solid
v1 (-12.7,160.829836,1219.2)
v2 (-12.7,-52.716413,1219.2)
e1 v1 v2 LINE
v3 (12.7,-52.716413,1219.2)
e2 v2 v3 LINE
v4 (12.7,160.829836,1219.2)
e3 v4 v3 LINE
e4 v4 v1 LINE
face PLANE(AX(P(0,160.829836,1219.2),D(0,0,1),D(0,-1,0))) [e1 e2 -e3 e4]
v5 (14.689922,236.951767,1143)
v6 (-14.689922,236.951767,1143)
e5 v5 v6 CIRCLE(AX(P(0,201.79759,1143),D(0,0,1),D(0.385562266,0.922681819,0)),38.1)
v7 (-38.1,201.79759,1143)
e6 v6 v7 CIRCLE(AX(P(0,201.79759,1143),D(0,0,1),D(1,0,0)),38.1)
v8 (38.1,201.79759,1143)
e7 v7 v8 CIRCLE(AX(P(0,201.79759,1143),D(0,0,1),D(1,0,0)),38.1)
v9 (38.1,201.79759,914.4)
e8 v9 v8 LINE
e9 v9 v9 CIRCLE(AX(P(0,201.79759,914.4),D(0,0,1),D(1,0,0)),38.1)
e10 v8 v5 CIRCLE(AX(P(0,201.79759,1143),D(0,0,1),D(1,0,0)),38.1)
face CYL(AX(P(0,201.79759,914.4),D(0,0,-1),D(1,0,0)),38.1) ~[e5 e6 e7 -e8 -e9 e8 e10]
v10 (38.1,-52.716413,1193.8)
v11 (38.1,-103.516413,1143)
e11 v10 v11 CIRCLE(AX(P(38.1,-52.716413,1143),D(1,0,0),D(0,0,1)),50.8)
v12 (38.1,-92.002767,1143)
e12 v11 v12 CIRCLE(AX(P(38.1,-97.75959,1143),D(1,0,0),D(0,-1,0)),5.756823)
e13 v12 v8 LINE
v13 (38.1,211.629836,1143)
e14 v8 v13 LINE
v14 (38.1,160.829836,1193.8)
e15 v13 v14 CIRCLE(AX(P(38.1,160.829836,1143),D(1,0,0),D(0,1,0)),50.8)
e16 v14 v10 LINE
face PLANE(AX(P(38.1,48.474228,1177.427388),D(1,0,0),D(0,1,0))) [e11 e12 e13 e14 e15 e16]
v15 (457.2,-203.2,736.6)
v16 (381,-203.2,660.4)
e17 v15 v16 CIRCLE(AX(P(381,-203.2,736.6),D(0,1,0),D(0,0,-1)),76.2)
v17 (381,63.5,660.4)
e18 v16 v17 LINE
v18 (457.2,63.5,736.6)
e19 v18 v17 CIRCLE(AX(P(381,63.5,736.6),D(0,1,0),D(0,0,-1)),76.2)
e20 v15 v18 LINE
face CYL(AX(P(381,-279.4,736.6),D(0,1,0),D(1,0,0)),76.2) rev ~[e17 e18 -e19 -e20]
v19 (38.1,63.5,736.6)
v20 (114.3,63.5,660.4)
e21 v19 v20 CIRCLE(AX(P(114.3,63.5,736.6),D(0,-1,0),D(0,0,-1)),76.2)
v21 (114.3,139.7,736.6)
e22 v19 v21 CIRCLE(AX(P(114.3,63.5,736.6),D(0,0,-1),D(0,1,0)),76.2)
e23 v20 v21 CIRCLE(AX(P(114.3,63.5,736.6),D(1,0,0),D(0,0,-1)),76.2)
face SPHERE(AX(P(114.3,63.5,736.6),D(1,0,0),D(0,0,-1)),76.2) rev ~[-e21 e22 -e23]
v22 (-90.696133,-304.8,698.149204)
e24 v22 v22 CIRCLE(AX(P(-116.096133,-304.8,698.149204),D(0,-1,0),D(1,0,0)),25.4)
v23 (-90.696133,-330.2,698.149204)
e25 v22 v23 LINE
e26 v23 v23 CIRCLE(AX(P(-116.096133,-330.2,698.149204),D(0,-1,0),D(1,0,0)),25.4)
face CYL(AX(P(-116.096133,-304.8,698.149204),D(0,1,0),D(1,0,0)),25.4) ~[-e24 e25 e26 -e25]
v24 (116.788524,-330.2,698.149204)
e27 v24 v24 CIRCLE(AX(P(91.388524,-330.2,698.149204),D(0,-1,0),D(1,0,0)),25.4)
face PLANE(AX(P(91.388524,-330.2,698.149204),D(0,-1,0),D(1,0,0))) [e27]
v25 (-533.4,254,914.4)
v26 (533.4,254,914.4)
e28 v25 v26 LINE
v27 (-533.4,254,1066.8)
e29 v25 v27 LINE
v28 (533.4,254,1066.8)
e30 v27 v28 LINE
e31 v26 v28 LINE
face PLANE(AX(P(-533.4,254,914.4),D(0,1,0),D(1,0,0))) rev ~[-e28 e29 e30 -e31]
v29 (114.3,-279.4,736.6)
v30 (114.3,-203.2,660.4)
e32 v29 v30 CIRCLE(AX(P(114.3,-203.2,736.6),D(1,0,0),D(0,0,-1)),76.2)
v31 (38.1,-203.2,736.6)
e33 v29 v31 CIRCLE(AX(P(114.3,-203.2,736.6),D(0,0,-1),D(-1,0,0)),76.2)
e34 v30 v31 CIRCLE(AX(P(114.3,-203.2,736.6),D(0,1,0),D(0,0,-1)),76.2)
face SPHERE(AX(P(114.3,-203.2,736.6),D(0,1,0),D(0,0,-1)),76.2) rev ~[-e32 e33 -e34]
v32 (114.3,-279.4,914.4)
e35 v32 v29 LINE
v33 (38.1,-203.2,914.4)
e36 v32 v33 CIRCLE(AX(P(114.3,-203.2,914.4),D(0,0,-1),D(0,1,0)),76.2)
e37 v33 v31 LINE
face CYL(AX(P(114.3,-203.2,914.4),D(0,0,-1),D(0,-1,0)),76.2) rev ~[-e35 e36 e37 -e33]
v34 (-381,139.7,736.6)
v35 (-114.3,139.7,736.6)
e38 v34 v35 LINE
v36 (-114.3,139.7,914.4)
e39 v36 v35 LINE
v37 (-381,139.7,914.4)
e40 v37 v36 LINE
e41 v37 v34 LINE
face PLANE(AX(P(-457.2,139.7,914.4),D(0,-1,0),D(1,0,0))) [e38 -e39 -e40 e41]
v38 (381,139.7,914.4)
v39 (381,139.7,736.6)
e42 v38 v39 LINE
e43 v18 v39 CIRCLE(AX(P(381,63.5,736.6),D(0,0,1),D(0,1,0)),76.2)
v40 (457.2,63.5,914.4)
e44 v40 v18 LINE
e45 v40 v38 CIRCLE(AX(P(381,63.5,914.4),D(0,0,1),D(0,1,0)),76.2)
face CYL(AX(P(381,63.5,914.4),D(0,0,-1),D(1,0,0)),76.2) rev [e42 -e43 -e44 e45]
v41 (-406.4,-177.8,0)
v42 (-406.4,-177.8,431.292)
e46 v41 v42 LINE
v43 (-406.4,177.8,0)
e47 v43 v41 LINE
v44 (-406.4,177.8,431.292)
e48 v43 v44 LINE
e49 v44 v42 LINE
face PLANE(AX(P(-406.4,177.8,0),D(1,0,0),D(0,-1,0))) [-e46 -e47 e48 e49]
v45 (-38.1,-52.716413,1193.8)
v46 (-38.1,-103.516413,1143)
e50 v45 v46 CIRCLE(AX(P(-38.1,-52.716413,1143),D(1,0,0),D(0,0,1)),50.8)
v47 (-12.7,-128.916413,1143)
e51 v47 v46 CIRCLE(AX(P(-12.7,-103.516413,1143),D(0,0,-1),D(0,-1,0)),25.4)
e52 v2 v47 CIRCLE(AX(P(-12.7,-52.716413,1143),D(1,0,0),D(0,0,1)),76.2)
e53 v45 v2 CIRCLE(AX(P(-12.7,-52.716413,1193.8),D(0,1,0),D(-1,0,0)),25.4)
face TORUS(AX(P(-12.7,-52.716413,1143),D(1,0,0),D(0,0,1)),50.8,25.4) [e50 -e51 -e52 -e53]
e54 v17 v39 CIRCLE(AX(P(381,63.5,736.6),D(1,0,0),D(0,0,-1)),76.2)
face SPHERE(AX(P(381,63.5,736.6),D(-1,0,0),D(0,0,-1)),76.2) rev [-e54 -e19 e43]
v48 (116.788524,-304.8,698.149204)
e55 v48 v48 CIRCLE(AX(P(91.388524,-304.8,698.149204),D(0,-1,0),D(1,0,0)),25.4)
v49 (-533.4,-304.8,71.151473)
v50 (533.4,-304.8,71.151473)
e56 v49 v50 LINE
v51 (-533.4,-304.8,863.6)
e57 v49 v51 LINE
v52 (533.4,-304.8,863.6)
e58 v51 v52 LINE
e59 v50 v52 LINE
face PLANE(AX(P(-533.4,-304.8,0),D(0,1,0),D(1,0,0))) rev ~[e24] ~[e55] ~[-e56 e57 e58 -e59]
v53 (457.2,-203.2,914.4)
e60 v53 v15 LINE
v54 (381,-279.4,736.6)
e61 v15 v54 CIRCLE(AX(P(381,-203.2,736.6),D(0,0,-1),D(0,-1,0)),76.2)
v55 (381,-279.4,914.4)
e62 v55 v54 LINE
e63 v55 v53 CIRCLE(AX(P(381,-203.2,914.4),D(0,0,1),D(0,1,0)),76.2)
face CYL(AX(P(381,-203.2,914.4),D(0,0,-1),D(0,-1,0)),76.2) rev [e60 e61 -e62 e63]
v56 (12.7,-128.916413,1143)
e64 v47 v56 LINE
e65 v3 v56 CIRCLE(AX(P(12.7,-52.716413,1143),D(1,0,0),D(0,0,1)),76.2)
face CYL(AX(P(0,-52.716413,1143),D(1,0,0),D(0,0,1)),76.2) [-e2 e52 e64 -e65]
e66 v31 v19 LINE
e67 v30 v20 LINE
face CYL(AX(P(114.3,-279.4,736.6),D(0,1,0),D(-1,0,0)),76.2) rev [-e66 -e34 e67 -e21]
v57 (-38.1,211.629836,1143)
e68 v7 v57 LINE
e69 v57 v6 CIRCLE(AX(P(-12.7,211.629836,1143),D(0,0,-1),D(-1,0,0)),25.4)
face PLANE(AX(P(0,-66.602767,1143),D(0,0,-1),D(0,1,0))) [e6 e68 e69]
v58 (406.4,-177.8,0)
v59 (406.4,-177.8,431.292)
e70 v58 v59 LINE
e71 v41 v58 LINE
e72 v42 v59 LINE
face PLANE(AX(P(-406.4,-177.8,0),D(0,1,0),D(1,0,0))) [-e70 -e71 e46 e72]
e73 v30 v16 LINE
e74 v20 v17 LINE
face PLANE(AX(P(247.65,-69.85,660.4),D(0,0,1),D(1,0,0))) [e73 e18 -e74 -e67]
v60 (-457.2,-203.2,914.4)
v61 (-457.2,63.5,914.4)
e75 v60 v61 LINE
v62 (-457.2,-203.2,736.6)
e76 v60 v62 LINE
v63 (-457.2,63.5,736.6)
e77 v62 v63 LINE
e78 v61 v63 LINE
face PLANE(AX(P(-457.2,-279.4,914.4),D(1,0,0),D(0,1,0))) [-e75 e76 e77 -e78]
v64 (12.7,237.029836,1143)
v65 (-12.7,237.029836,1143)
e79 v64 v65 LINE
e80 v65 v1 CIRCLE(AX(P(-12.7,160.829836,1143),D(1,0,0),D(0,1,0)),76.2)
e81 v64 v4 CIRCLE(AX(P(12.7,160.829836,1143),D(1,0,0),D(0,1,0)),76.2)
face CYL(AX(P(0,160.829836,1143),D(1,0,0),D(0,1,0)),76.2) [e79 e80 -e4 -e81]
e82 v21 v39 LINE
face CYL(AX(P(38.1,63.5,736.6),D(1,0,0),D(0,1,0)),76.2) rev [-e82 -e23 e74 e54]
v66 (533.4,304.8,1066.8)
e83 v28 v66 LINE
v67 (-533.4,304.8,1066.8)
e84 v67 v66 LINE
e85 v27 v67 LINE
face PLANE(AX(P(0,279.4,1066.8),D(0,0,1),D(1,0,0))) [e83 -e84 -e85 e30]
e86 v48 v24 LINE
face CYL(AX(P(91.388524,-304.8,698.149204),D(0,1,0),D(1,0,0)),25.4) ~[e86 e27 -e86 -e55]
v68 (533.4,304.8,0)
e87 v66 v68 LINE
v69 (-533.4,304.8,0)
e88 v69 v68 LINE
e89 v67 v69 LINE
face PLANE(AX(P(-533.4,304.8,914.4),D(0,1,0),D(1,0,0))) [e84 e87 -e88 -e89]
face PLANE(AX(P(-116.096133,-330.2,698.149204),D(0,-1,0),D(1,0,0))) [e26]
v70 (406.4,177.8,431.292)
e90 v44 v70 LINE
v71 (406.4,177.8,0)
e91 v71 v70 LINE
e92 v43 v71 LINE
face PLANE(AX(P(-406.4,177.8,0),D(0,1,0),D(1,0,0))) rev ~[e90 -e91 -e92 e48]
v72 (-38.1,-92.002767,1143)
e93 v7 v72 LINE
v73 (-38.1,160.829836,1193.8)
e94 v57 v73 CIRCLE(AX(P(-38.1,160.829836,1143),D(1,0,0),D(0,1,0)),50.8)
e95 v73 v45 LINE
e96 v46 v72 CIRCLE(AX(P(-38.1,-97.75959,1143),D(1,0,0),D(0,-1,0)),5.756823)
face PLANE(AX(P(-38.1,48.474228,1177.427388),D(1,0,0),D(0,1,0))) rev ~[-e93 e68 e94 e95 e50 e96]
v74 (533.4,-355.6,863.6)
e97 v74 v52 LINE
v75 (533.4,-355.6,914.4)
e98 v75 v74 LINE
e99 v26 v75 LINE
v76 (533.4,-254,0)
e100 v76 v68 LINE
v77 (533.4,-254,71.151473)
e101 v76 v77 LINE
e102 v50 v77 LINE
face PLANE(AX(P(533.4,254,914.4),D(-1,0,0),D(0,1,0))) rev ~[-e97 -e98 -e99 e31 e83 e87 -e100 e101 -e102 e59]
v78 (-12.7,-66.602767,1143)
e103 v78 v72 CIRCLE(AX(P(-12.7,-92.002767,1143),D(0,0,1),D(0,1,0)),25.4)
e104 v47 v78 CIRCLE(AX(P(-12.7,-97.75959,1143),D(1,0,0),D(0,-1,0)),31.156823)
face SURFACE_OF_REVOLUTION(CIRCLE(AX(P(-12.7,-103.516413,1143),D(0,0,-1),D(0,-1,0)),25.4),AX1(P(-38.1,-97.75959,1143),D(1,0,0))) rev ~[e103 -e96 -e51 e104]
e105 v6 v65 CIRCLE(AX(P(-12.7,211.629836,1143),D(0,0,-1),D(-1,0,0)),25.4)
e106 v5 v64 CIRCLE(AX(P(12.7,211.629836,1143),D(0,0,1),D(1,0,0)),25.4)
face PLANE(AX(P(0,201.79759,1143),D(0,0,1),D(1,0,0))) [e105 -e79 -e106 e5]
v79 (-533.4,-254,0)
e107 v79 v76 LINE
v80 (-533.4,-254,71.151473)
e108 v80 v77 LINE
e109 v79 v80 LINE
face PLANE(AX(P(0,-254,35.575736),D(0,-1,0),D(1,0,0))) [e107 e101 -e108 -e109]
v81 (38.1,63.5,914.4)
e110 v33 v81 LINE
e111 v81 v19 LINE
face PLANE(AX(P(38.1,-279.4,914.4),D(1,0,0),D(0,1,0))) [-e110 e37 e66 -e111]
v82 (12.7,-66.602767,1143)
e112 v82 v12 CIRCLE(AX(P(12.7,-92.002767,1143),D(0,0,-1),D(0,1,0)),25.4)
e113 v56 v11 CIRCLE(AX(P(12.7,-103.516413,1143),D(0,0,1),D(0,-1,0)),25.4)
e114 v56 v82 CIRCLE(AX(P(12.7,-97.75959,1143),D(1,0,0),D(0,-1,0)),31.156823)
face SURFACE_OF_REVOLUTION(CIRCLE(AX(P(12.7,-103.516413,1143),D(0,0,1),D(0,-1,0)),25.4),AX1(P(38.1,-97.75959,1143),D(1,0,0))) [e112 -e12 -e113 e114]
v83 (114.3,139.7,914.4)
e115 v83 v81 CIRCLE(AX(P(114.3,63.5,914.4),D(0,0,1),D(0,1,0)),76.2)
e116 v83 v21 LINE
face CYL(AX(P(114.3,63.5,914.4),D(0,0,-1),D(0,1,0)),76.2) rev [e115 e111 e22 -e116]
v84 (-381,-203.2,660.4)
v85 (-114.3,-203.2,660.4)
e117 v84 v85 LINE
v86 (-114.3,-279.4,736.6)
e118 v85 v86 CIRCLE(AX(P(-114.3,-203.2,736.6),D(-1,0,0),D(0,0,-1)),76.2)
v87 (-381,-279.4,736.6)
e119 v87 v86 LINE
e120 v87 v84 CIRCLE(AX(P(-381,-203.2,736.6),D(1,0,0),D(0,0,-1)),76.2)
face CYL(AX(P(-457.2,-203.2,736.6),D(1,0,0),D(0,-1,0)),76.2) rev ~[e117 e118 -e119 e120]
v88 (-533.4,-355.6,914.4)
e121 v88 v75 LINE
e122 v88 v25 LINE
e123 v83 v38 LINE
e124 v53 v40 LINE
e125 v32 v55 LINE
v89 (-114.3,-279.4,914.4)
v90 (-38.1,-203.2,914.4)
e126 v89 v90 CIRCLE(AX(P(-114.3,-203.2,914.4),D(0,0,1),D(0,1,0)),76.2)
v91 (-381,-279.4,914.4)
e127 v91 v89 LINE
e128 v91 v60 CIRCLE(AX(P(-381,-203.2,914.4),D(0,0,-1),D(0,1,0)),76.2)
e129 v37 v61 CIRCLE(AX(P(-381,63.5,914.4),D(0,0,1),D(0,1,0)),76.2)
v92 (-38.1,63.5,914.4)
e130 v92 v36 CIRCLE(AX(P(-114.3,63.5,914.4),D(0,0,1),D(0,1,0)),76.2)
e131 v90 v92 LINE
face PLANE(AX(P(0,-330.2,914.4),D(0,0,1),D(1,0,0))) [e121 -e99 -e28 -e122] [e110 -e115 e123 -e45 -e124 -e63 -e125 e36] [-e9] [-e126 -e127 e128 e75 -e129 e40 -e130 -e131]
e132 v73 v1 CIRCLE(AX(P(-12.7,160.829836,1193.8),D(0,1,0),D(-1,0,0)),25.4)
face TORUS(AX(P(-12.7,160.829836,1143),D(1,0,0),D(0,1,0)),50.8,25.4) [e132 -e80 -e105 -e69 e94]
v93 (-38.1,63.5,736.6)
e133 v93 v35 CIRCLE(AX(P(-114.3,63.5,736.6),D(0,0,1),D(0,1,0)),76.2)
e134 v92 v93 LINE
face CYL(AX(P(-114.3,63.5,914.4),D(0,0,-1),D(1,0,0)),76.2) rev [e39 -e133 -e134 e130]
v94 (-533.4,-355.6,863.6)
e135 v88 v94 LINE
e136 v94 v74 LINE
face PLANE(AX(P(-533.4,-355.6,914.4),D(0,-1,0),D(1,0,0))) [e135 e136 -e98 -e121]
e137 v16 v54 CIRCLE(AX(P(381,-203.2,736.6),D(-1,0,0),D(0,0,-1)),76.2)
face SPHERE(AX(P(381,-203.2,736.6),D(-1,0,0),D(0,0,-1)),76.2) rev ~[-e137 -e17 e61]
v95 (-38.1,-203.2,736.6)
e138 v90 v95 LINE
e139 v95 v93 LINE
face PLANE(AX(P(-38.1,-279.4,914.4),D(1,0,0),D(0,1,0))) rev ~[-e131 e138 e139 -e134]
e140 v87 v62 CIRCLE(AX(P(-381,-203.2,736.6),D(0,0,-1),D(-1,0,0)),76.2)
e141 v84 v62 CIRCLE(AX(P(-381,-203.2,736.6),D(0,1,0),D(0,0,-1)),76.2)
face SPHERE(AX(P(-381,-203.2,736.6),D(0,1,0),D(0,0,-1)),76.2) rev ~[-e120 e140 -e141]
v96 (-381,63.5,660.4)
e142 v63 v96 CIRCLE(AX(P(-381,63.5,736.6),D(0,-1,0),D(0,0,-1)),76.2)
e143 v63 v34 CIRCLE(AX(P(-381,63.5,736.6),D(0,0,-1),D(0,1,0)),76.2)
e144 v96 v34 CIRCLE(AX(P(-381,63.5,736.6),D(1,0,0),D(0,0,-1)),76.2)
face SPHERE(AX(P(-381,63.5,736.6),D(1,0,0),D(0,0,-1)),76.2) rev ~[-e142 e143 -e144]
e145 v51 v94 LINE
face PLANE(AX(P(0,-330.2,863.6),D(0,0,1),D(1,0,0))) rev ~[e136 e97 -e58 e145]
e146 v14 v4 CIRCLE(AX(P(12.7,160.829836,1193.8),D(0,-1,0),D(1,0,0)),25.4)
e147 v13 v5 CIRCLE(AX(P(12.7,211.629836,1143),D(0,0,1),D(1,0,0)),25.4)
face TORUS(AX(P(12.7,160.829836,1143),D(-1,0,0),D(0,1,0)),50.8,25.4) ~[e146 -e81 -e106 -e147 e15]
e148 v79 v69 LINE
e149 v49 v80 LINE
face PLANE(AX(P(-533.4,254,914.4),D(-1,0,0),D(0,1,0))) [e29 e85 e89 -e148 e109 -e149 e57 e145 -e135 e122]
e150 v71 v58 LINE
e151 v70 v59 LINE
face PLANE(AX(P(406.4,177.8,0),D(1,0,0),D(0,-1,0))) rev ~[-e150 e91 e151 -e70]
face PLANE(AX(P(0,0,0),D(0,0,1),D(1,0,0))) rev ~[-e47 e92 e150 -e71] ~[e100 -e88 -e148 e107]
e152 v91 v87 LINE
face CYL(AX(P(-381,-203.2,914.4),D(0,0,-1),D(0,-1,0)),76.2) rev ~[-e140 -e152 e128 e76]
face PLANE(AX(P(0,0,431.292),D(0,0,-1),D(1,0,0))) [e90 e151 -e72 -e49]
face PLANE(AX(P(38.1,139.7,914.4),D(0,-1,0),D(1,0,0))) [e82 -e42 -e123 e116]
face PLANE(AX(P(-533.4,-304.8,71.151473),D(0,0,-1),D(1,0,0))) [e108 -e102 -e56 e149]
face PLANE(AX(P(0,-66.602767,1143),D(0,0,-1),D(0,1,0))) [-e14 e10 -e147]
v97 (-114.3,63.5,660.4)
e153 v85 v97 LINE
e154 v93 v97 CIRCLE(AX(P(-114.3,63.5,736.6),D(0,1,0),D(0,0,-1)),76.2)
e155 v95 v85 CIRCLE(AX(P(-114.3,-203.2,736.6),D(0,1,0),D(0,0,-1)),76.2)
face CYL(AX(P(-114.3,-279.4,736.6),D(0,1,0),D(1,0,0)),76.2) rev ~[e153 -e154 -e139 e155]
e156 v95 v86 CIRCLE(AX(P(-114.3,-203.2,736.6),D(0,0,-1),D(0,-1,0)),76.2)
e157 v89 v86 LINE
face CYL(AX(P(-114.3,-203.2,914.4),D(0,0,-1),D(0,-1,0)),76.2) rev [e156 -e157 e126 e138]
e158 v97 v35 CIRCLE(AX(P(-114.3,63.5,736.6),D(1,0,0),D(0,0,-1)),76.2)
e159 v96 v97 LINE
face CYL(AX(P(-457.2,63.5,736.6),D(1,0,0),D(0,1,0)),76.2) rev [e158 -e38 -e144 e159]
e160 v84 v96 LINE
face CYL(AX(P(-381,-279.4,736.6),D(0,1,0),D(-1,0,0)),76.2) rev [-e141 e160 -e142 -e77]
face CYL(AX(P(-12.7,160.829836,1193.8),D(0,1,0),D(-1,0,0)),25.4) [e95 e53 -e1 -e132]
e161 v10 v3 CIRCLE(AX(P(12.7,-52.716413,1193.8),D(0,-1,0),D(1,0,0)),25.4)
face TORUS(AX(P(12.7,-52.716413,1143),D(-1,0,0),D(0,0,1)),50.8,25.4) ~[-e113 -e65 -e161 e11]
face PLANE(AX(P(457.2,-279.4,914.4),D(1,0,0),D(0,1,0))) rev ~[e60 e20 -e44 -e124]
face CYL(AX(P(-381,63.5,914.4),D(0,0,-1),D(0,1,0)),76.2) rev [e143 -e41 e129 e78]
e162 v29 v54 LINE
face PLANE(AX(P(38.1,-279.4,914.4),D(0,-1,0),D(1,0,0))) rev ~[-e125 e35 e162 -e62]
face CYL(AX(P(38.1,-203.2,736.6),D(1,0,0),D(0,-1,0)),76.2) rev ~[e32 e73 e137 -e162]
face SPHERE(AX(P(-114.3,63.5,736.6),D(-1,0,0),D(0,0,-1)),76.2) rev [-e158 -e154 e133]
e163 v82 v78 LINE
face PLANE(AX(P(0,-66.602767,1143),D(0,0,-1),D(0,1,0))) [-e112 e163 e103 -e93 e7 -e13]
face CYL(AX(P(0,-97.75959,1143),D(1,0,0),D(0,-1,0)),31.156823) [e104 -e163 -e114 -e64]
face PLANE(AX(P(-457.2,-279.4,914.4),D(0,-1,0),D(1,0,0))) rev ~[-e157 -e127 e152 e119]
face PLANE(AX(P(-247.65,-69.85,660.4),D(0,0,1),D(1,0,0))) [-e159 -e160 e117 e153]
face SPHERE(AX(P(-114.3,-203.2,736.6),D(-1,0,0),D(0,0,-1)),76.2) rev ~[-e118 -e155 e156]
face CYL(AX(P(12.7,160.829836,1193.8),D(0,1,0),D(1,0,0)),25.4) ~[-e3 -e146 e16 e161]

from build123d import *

# Parameters (mm, degrees)
F0_W          = 1066.8
F0_H          = 609.6
F1_DEPTH      = 914.4
F2_W          = 1066.8
F2_H          = 50.8
F2_H_2        = 609.6
F3_DEPTH      = 50.8
F4_W          = 1066.8
F4_H          = 50.8
F5_DEPTH      = 152.4
F4_W_2        = 419.1
F4_H_2        = 419.1
F6_DEPTH      = 254
F7_R          = 76.2
F4_R          = 38.1
F8_DEPTH      = 228.6
F10_DEPTH     = 38.1
F11_T3_DEPTH  = 213.5462481737
F11_T6_DEPTH  = 213.5462481737
F11_T9_ANGLE  = 180
F11_T12_ANGLE = 180
F11_T15_ANGLE = 90
F11_T18_ANGLE = 90
F11_T21_ANGLE = 90
F11_T24_ANGLE = 90
F12_W         = 812.8
F12_H         = 355.6
F13_DEPTH     = 431.292
F14_W         = 1066.8
F14_H         = 71.1514726281
F15_DEPTH     = 50.8
F16_R         = 25.4
F17_DEPTH     = 25.4


# Not quite as in the source:
# - a fillet or chamfer that OpenCascade refuses, or shapes differently, is made with other operations: its cross-section is extruded or revolved along the edge and cut away or added


with BuildPart() as f1:
    # F0 (on Top) → F1 (new body)
    with BuildSketch(Plane.XY):
        Rectangle(F0_W, F0_H)
    extrude(amount=F1_DEPTH)

    # F2 (on face) → F3 (join)
    with BuildSketch(Plane.XY.offset(914.4)):
        with Locations((0, -330.2)):
            Rectangle(F2_W, F2_H)
        Rectangle(F2_W, F2_H_2)
    extrude(amount=-F3_DEPTH)

    # F4 (on face) → F5 (join)
    with BuildSketch(Plane.XY.offset(914.4)):
        with Locations((0, 279.4)):
            Rectangle(F4_W, F4_H)
    extrude(amount=F5_DEPTH)

    # F4 (on face) → F6 (cut)
    with BuildSketch(Plane.XY.offset(914.4)):
        with Locations((-247.65, -69.85)):
            Rectangle(F4_W_2, F4_H_2)
        with Locations((247.65, -69.85)):
            Rectangle(F4_W_2, F4_H_2)
    extrude(amount=-F6_DEPTH, mode=Mode.SUBTRACT)

    # F7
    f7_edges = [f1.edges().sort_by_distance(p)[0] for p in [
        (-247.65, 139.7, 660.4),
        (-457.2, -69.85, 660.4),
        (-247.65, -279.4, 660.4),
        (-38.1, -69.85, 660.4),
        (247.65, 139.7, 660.4),
        (38.1, -69.85, 660.4),
        (247.65, -279.4, 660.4),
        (457.2, -69.85, 660.4),
        (457.2, 139.7, 787.4),
        (38.1, 139.7, 787.4),
        (457.2, -279.4, 787.4),
        (38.1, -279.4, 787.4),
        (-457.2, -279.4, 787.4),
        (-38.1, -279.4, 787.4),
        (-38.1, 139.7, 787.4),
        (-457.2, 139.7, 787.4),
    ]]
    fillet(f7_edges, radius=F7_R)

    # F4 (on face) → F8 (join)
    with BuildSketch(Plane.XY.offset(914.4)):
        with Locations((0, 201.7975896597)):
            Circle(F4_R)
    extrude(amount=F8_DEPTH)

    # F9 (on Right) → F10 (join, symmetric)
    with BuildSketch(Plane.YZ):
        with BuildLine():
            Line((160.8298355818, 1219.2), (-52.7164125919, 1219.2))
            ThreePointArc((-52.7164125919, 1219.2), (-106.5979493183, 1196.8815367264), (-128.9164125919, 1143))
            ThreePointArc((-128.9164125919, 1143), (-97.7595895529, 1174.1568230391), (-66.6027665138, 1143))
            Line((-66.6027665138, 1143), (237.0298355818, 1143))
            ThreePointArc((237.0298355818, 1143), (214.7113723082, 1196.8815367264), (160.8298355818, 1219.2))
        make_face()
        with BuildLine():
            ThreePointArc((-66.6027665138, 1143), (-97.7595895529, 1174.1568230391), (-128.9164125919, 1143))
            Line((-128.9164125919, 1143), (-66.6027665138, 1143))
        make_face()
        with BuildLine():
            Line((-66.6027665138, 1143), (-128.9164125919, 1143))
            ThreePointArc((-128.9164125919, 1143), (-97.7595895529, 1111.8431769609), (-66.6027665138, 1143))
        make_face()
    extrude(amount=F10_DEPTH, both=True)

    # F11: fillet of radius 25.4 on 8 edges, made by hand


with BuildPart() as f11_tool1:
    # F11_s2 → F11_t3 (new body)
    with BuildSketch(Plane.XZ.offset(-160.8298355818)):
        with BuildLine():
            ThreePointArc((38.1, 1193.8), (30.6605122421, 1211.7605122421), (12.7, 1219.2))
            Line((12.7, 1219.2), (12.7, 1219.708))
            Line((12.7, 1219.708), (38.608, 1219.708))
            Line((38.608, 1219.708), (38.608, 1193.8))
            Line((38.608, 1193.8), (38.1, 1193.8))
        make_face()
    extrude(amount=F11_T3_DEPTH)


with BuildPart() as f11_tool4:
    # F11_s5 → F11_t6 (new body)
    with BuildSketch(Plane.XZ.offset(-160.8298355818)):
        with BuildLine():
            ThreePointArc((-38.1, 1193.8), (-30.6605122421, 1211.7605122421), (-12.7, 1219.2))
            Line((-12.7, 1219.2), (-12.7, 1219.708))
            Line((-12.7, 1219.708), (-38.608, 1219.708))
            Line((-38.608, 1219.708), (-38.608, 1193.8))
            Line((-38.608, 1193.8), (-38.1, 1193.8))
        make_face()
    extrude(amount=F11_T6_DEPTH)


with BuildPart() as f11_tool7:
    # F11_s8 → F11_t9 (revolve)
    with BuildSketch(Plane.XY.offset(1143)):
        with BuildLine():
            ThreePointArc((-12.7, -128.9164125919), (-30.6605122421, -121.4769248341), (-38.1, -103.5164125919))
            Line((-38.1, -103.5164125919), (-38.608, -103.5164125919))
            Line((-38.608, -103.5164125919), (-38.608, -129.4244125919))
            Line((-38.608, -129.4244125919), (-12.7, -129.4244125919))
            Line((-12.7, -129.4244125919), (-12.7, -128.9164125919))
        make_face()
    revolve(axis=Axis((-38.1, -97.7595895529, 1143), (1, 0, 0)), revolution_arc=F11_T9_ANGLE)


with BuildPart() as f11_tool10:
    # F11_s11 → F11_t12 (revolve)
    with BuildSketch(Plane.XY.offset(1143)):
        with BuildLine():
            ThreePointArc((12.7, -128.9164125919), (30.6605122421, -121.4769248341), (38.1, -103.5164125919))
            Line((38.1, -103.5164125919), (38.608, -103.5164125919))
            Line((38.608, -103.5164125919), (38.608, -129.4244125919))
            Line((38.608, -129.4244125919), (12.7, -129.4244125919))
            Line((12.7, -129.4244125919), (12.7, -128.9164125919))
        make_face()
    revolve(axis=Axis((38.1, -97.7595895529, 1143), (1, 0, 0)), revolution_arc=F11_T12_ANGLE)


with BuildPart() as f11_tool13:
    # F11_s14 → F11_t15 (revolve)
    with BuildSketch(Plane.XZ.offset(52.7164125919)):
        with BuildLine():
            ThreePointArc((38.1, 1193.8), (30.6605122421, 1211.7605122421), (12.7, 1219.2))
            Line((12.7, 1219.2), (12.7, 1219.708))
            Line((12.7, 1219.708), (38.608, 1219.708))
            Line((38.608, 1219.708), (38.608, 1193.8))
            Line((38.608, 1193.8), (38.1, 1193.8))
        make_face()
    revolve(axis=Axis((38.1, -52.7164125919, 1143), (1, 0, 0)), revolution_arc=F11_T15_ANGLE)


with BuildPart() as f11_tool16:
    # F11_s17 → F11_t18 (revolve)
    with BuildSketch(Plane.XY.offset(1143)):
        with BuildLine():
            ThreePointArc((38.1, 211.6298355818), (30.6605122421, 229.5903478239), (12.7, 237.0298355818))
            Line((12.7, 237.0298355818), (12.7, 237.5378355818))
            Line((12.7, 237.5378355818), (38.608, 237.5378355818))
            Line((38.608, 237.5378355818), (38.608, 211.6298355818))
            Line((38.608, 211.6298355818), (38.1, 211.6298355818))
        make_face()
    revolve(axis=Axis((38.1, 160.8298355818, 1143), (1, 0, 0)), revolution_arc=F11_T18_ANGLE)


with BuildPart() as f11_tool19:
    # F11_s20 → F11_t21 (revolve)
    with BuildSketch(Plane.XZ.offset(52.7164125919)):
        with BuildLine():
            ThreePointArc((-38.1, 1193.8), (-30.6605122421, 1211.7605122421), (-12.7, 1219.2))
            Line((-12.7, 1219.2), (-12.7, 1219.708))
            Line((-12.7, 1219.708), (-38.608, 1219.708))
            Line((-38.608, 1219.708), (-38.608, 1193.8))
            Line((-38.608, 1193.8), (-38.1, 1193.8))
        make_face()
    revolve(axis=Axis((-38.1, -52.7164125919, 1143), (1, 0, 0)), revolution_arc=F11_T21_ANGLE)


with BuildPart() as f11_tool22:
    # F11_s23 → F11_t24 (revolve)
    with BuildSketch(Plane.XY.offset(1143)):
        with BuildLine():
            ThreePointArc((-38.1, 211.6298355818), (-30.6605122421, 229.5903478239), (-12.7, 237.0298355818))
            Line((-12.7, 237.0298355818), (-12.7, 237.5378355818))
            Line((-12.7, 237.5378355818), (-38.608, 237.5378355818))
            Line((-38.608, 237.5378355818), (-38.608, 211.6298355818))
            Line((-38.608, 211.6298355818), (-38.1, 211.6298355818))
        make_face()
    revolve(axis=Axis((-38.1, 160.8298355818, 1143), (1, 0, 0)), revolution_arc=F11_T24_ANGLE)


with BuildPart() as f1_1:
    add(f1.part)

    # F11_t25: cut F11_tool1, F11_tool4, F11_tool7, F11_tool10, F11_tool13, F11_tool16, F11_tool19, F11_tool22
    add([f11_tool1.part, f11_tool4.part, f11_tool7.part, f11_tool10.part, f11_tool13.part, f11_tool16.part, f11_tool19.part, f11_tool22.part], mode=Mode.SUBTRACT)

    # F12 (on face) → F13 (cut)
    with BuildSketch(Plane(origin=(0, 0, 0), x_dir=(1, 0, 0), z_dir=(0, 0, -1))):
        Rectangle(F12_W, F12_H)
    extrude(amount=-F13_DEPTH, mode=Mode.SUBTRACT)

    # F14 (on face) → F15 (cut)
    with BuildSketch(Plane.XZ.offset(304.8)):
        with Locations((0, 35.5757363141)):
            Rectangle(F14_W, F14_H)
    extrude(amount=-F15_DEPTH, mode=Mode.SUBTRACT)

    # F16 (on face) → F17 (join)
    with BuildSketch(Plane.XZ.offset(304.8)):
        with Locations((-116.0961332864, 698.1492042542)):
            Circle(F16_R)
        with Locations((91.3885235786, 698.1492042542)):
            Circle(F16_R)
    extrude(amount=F17_DEPTH)


solid = f1_1.part
